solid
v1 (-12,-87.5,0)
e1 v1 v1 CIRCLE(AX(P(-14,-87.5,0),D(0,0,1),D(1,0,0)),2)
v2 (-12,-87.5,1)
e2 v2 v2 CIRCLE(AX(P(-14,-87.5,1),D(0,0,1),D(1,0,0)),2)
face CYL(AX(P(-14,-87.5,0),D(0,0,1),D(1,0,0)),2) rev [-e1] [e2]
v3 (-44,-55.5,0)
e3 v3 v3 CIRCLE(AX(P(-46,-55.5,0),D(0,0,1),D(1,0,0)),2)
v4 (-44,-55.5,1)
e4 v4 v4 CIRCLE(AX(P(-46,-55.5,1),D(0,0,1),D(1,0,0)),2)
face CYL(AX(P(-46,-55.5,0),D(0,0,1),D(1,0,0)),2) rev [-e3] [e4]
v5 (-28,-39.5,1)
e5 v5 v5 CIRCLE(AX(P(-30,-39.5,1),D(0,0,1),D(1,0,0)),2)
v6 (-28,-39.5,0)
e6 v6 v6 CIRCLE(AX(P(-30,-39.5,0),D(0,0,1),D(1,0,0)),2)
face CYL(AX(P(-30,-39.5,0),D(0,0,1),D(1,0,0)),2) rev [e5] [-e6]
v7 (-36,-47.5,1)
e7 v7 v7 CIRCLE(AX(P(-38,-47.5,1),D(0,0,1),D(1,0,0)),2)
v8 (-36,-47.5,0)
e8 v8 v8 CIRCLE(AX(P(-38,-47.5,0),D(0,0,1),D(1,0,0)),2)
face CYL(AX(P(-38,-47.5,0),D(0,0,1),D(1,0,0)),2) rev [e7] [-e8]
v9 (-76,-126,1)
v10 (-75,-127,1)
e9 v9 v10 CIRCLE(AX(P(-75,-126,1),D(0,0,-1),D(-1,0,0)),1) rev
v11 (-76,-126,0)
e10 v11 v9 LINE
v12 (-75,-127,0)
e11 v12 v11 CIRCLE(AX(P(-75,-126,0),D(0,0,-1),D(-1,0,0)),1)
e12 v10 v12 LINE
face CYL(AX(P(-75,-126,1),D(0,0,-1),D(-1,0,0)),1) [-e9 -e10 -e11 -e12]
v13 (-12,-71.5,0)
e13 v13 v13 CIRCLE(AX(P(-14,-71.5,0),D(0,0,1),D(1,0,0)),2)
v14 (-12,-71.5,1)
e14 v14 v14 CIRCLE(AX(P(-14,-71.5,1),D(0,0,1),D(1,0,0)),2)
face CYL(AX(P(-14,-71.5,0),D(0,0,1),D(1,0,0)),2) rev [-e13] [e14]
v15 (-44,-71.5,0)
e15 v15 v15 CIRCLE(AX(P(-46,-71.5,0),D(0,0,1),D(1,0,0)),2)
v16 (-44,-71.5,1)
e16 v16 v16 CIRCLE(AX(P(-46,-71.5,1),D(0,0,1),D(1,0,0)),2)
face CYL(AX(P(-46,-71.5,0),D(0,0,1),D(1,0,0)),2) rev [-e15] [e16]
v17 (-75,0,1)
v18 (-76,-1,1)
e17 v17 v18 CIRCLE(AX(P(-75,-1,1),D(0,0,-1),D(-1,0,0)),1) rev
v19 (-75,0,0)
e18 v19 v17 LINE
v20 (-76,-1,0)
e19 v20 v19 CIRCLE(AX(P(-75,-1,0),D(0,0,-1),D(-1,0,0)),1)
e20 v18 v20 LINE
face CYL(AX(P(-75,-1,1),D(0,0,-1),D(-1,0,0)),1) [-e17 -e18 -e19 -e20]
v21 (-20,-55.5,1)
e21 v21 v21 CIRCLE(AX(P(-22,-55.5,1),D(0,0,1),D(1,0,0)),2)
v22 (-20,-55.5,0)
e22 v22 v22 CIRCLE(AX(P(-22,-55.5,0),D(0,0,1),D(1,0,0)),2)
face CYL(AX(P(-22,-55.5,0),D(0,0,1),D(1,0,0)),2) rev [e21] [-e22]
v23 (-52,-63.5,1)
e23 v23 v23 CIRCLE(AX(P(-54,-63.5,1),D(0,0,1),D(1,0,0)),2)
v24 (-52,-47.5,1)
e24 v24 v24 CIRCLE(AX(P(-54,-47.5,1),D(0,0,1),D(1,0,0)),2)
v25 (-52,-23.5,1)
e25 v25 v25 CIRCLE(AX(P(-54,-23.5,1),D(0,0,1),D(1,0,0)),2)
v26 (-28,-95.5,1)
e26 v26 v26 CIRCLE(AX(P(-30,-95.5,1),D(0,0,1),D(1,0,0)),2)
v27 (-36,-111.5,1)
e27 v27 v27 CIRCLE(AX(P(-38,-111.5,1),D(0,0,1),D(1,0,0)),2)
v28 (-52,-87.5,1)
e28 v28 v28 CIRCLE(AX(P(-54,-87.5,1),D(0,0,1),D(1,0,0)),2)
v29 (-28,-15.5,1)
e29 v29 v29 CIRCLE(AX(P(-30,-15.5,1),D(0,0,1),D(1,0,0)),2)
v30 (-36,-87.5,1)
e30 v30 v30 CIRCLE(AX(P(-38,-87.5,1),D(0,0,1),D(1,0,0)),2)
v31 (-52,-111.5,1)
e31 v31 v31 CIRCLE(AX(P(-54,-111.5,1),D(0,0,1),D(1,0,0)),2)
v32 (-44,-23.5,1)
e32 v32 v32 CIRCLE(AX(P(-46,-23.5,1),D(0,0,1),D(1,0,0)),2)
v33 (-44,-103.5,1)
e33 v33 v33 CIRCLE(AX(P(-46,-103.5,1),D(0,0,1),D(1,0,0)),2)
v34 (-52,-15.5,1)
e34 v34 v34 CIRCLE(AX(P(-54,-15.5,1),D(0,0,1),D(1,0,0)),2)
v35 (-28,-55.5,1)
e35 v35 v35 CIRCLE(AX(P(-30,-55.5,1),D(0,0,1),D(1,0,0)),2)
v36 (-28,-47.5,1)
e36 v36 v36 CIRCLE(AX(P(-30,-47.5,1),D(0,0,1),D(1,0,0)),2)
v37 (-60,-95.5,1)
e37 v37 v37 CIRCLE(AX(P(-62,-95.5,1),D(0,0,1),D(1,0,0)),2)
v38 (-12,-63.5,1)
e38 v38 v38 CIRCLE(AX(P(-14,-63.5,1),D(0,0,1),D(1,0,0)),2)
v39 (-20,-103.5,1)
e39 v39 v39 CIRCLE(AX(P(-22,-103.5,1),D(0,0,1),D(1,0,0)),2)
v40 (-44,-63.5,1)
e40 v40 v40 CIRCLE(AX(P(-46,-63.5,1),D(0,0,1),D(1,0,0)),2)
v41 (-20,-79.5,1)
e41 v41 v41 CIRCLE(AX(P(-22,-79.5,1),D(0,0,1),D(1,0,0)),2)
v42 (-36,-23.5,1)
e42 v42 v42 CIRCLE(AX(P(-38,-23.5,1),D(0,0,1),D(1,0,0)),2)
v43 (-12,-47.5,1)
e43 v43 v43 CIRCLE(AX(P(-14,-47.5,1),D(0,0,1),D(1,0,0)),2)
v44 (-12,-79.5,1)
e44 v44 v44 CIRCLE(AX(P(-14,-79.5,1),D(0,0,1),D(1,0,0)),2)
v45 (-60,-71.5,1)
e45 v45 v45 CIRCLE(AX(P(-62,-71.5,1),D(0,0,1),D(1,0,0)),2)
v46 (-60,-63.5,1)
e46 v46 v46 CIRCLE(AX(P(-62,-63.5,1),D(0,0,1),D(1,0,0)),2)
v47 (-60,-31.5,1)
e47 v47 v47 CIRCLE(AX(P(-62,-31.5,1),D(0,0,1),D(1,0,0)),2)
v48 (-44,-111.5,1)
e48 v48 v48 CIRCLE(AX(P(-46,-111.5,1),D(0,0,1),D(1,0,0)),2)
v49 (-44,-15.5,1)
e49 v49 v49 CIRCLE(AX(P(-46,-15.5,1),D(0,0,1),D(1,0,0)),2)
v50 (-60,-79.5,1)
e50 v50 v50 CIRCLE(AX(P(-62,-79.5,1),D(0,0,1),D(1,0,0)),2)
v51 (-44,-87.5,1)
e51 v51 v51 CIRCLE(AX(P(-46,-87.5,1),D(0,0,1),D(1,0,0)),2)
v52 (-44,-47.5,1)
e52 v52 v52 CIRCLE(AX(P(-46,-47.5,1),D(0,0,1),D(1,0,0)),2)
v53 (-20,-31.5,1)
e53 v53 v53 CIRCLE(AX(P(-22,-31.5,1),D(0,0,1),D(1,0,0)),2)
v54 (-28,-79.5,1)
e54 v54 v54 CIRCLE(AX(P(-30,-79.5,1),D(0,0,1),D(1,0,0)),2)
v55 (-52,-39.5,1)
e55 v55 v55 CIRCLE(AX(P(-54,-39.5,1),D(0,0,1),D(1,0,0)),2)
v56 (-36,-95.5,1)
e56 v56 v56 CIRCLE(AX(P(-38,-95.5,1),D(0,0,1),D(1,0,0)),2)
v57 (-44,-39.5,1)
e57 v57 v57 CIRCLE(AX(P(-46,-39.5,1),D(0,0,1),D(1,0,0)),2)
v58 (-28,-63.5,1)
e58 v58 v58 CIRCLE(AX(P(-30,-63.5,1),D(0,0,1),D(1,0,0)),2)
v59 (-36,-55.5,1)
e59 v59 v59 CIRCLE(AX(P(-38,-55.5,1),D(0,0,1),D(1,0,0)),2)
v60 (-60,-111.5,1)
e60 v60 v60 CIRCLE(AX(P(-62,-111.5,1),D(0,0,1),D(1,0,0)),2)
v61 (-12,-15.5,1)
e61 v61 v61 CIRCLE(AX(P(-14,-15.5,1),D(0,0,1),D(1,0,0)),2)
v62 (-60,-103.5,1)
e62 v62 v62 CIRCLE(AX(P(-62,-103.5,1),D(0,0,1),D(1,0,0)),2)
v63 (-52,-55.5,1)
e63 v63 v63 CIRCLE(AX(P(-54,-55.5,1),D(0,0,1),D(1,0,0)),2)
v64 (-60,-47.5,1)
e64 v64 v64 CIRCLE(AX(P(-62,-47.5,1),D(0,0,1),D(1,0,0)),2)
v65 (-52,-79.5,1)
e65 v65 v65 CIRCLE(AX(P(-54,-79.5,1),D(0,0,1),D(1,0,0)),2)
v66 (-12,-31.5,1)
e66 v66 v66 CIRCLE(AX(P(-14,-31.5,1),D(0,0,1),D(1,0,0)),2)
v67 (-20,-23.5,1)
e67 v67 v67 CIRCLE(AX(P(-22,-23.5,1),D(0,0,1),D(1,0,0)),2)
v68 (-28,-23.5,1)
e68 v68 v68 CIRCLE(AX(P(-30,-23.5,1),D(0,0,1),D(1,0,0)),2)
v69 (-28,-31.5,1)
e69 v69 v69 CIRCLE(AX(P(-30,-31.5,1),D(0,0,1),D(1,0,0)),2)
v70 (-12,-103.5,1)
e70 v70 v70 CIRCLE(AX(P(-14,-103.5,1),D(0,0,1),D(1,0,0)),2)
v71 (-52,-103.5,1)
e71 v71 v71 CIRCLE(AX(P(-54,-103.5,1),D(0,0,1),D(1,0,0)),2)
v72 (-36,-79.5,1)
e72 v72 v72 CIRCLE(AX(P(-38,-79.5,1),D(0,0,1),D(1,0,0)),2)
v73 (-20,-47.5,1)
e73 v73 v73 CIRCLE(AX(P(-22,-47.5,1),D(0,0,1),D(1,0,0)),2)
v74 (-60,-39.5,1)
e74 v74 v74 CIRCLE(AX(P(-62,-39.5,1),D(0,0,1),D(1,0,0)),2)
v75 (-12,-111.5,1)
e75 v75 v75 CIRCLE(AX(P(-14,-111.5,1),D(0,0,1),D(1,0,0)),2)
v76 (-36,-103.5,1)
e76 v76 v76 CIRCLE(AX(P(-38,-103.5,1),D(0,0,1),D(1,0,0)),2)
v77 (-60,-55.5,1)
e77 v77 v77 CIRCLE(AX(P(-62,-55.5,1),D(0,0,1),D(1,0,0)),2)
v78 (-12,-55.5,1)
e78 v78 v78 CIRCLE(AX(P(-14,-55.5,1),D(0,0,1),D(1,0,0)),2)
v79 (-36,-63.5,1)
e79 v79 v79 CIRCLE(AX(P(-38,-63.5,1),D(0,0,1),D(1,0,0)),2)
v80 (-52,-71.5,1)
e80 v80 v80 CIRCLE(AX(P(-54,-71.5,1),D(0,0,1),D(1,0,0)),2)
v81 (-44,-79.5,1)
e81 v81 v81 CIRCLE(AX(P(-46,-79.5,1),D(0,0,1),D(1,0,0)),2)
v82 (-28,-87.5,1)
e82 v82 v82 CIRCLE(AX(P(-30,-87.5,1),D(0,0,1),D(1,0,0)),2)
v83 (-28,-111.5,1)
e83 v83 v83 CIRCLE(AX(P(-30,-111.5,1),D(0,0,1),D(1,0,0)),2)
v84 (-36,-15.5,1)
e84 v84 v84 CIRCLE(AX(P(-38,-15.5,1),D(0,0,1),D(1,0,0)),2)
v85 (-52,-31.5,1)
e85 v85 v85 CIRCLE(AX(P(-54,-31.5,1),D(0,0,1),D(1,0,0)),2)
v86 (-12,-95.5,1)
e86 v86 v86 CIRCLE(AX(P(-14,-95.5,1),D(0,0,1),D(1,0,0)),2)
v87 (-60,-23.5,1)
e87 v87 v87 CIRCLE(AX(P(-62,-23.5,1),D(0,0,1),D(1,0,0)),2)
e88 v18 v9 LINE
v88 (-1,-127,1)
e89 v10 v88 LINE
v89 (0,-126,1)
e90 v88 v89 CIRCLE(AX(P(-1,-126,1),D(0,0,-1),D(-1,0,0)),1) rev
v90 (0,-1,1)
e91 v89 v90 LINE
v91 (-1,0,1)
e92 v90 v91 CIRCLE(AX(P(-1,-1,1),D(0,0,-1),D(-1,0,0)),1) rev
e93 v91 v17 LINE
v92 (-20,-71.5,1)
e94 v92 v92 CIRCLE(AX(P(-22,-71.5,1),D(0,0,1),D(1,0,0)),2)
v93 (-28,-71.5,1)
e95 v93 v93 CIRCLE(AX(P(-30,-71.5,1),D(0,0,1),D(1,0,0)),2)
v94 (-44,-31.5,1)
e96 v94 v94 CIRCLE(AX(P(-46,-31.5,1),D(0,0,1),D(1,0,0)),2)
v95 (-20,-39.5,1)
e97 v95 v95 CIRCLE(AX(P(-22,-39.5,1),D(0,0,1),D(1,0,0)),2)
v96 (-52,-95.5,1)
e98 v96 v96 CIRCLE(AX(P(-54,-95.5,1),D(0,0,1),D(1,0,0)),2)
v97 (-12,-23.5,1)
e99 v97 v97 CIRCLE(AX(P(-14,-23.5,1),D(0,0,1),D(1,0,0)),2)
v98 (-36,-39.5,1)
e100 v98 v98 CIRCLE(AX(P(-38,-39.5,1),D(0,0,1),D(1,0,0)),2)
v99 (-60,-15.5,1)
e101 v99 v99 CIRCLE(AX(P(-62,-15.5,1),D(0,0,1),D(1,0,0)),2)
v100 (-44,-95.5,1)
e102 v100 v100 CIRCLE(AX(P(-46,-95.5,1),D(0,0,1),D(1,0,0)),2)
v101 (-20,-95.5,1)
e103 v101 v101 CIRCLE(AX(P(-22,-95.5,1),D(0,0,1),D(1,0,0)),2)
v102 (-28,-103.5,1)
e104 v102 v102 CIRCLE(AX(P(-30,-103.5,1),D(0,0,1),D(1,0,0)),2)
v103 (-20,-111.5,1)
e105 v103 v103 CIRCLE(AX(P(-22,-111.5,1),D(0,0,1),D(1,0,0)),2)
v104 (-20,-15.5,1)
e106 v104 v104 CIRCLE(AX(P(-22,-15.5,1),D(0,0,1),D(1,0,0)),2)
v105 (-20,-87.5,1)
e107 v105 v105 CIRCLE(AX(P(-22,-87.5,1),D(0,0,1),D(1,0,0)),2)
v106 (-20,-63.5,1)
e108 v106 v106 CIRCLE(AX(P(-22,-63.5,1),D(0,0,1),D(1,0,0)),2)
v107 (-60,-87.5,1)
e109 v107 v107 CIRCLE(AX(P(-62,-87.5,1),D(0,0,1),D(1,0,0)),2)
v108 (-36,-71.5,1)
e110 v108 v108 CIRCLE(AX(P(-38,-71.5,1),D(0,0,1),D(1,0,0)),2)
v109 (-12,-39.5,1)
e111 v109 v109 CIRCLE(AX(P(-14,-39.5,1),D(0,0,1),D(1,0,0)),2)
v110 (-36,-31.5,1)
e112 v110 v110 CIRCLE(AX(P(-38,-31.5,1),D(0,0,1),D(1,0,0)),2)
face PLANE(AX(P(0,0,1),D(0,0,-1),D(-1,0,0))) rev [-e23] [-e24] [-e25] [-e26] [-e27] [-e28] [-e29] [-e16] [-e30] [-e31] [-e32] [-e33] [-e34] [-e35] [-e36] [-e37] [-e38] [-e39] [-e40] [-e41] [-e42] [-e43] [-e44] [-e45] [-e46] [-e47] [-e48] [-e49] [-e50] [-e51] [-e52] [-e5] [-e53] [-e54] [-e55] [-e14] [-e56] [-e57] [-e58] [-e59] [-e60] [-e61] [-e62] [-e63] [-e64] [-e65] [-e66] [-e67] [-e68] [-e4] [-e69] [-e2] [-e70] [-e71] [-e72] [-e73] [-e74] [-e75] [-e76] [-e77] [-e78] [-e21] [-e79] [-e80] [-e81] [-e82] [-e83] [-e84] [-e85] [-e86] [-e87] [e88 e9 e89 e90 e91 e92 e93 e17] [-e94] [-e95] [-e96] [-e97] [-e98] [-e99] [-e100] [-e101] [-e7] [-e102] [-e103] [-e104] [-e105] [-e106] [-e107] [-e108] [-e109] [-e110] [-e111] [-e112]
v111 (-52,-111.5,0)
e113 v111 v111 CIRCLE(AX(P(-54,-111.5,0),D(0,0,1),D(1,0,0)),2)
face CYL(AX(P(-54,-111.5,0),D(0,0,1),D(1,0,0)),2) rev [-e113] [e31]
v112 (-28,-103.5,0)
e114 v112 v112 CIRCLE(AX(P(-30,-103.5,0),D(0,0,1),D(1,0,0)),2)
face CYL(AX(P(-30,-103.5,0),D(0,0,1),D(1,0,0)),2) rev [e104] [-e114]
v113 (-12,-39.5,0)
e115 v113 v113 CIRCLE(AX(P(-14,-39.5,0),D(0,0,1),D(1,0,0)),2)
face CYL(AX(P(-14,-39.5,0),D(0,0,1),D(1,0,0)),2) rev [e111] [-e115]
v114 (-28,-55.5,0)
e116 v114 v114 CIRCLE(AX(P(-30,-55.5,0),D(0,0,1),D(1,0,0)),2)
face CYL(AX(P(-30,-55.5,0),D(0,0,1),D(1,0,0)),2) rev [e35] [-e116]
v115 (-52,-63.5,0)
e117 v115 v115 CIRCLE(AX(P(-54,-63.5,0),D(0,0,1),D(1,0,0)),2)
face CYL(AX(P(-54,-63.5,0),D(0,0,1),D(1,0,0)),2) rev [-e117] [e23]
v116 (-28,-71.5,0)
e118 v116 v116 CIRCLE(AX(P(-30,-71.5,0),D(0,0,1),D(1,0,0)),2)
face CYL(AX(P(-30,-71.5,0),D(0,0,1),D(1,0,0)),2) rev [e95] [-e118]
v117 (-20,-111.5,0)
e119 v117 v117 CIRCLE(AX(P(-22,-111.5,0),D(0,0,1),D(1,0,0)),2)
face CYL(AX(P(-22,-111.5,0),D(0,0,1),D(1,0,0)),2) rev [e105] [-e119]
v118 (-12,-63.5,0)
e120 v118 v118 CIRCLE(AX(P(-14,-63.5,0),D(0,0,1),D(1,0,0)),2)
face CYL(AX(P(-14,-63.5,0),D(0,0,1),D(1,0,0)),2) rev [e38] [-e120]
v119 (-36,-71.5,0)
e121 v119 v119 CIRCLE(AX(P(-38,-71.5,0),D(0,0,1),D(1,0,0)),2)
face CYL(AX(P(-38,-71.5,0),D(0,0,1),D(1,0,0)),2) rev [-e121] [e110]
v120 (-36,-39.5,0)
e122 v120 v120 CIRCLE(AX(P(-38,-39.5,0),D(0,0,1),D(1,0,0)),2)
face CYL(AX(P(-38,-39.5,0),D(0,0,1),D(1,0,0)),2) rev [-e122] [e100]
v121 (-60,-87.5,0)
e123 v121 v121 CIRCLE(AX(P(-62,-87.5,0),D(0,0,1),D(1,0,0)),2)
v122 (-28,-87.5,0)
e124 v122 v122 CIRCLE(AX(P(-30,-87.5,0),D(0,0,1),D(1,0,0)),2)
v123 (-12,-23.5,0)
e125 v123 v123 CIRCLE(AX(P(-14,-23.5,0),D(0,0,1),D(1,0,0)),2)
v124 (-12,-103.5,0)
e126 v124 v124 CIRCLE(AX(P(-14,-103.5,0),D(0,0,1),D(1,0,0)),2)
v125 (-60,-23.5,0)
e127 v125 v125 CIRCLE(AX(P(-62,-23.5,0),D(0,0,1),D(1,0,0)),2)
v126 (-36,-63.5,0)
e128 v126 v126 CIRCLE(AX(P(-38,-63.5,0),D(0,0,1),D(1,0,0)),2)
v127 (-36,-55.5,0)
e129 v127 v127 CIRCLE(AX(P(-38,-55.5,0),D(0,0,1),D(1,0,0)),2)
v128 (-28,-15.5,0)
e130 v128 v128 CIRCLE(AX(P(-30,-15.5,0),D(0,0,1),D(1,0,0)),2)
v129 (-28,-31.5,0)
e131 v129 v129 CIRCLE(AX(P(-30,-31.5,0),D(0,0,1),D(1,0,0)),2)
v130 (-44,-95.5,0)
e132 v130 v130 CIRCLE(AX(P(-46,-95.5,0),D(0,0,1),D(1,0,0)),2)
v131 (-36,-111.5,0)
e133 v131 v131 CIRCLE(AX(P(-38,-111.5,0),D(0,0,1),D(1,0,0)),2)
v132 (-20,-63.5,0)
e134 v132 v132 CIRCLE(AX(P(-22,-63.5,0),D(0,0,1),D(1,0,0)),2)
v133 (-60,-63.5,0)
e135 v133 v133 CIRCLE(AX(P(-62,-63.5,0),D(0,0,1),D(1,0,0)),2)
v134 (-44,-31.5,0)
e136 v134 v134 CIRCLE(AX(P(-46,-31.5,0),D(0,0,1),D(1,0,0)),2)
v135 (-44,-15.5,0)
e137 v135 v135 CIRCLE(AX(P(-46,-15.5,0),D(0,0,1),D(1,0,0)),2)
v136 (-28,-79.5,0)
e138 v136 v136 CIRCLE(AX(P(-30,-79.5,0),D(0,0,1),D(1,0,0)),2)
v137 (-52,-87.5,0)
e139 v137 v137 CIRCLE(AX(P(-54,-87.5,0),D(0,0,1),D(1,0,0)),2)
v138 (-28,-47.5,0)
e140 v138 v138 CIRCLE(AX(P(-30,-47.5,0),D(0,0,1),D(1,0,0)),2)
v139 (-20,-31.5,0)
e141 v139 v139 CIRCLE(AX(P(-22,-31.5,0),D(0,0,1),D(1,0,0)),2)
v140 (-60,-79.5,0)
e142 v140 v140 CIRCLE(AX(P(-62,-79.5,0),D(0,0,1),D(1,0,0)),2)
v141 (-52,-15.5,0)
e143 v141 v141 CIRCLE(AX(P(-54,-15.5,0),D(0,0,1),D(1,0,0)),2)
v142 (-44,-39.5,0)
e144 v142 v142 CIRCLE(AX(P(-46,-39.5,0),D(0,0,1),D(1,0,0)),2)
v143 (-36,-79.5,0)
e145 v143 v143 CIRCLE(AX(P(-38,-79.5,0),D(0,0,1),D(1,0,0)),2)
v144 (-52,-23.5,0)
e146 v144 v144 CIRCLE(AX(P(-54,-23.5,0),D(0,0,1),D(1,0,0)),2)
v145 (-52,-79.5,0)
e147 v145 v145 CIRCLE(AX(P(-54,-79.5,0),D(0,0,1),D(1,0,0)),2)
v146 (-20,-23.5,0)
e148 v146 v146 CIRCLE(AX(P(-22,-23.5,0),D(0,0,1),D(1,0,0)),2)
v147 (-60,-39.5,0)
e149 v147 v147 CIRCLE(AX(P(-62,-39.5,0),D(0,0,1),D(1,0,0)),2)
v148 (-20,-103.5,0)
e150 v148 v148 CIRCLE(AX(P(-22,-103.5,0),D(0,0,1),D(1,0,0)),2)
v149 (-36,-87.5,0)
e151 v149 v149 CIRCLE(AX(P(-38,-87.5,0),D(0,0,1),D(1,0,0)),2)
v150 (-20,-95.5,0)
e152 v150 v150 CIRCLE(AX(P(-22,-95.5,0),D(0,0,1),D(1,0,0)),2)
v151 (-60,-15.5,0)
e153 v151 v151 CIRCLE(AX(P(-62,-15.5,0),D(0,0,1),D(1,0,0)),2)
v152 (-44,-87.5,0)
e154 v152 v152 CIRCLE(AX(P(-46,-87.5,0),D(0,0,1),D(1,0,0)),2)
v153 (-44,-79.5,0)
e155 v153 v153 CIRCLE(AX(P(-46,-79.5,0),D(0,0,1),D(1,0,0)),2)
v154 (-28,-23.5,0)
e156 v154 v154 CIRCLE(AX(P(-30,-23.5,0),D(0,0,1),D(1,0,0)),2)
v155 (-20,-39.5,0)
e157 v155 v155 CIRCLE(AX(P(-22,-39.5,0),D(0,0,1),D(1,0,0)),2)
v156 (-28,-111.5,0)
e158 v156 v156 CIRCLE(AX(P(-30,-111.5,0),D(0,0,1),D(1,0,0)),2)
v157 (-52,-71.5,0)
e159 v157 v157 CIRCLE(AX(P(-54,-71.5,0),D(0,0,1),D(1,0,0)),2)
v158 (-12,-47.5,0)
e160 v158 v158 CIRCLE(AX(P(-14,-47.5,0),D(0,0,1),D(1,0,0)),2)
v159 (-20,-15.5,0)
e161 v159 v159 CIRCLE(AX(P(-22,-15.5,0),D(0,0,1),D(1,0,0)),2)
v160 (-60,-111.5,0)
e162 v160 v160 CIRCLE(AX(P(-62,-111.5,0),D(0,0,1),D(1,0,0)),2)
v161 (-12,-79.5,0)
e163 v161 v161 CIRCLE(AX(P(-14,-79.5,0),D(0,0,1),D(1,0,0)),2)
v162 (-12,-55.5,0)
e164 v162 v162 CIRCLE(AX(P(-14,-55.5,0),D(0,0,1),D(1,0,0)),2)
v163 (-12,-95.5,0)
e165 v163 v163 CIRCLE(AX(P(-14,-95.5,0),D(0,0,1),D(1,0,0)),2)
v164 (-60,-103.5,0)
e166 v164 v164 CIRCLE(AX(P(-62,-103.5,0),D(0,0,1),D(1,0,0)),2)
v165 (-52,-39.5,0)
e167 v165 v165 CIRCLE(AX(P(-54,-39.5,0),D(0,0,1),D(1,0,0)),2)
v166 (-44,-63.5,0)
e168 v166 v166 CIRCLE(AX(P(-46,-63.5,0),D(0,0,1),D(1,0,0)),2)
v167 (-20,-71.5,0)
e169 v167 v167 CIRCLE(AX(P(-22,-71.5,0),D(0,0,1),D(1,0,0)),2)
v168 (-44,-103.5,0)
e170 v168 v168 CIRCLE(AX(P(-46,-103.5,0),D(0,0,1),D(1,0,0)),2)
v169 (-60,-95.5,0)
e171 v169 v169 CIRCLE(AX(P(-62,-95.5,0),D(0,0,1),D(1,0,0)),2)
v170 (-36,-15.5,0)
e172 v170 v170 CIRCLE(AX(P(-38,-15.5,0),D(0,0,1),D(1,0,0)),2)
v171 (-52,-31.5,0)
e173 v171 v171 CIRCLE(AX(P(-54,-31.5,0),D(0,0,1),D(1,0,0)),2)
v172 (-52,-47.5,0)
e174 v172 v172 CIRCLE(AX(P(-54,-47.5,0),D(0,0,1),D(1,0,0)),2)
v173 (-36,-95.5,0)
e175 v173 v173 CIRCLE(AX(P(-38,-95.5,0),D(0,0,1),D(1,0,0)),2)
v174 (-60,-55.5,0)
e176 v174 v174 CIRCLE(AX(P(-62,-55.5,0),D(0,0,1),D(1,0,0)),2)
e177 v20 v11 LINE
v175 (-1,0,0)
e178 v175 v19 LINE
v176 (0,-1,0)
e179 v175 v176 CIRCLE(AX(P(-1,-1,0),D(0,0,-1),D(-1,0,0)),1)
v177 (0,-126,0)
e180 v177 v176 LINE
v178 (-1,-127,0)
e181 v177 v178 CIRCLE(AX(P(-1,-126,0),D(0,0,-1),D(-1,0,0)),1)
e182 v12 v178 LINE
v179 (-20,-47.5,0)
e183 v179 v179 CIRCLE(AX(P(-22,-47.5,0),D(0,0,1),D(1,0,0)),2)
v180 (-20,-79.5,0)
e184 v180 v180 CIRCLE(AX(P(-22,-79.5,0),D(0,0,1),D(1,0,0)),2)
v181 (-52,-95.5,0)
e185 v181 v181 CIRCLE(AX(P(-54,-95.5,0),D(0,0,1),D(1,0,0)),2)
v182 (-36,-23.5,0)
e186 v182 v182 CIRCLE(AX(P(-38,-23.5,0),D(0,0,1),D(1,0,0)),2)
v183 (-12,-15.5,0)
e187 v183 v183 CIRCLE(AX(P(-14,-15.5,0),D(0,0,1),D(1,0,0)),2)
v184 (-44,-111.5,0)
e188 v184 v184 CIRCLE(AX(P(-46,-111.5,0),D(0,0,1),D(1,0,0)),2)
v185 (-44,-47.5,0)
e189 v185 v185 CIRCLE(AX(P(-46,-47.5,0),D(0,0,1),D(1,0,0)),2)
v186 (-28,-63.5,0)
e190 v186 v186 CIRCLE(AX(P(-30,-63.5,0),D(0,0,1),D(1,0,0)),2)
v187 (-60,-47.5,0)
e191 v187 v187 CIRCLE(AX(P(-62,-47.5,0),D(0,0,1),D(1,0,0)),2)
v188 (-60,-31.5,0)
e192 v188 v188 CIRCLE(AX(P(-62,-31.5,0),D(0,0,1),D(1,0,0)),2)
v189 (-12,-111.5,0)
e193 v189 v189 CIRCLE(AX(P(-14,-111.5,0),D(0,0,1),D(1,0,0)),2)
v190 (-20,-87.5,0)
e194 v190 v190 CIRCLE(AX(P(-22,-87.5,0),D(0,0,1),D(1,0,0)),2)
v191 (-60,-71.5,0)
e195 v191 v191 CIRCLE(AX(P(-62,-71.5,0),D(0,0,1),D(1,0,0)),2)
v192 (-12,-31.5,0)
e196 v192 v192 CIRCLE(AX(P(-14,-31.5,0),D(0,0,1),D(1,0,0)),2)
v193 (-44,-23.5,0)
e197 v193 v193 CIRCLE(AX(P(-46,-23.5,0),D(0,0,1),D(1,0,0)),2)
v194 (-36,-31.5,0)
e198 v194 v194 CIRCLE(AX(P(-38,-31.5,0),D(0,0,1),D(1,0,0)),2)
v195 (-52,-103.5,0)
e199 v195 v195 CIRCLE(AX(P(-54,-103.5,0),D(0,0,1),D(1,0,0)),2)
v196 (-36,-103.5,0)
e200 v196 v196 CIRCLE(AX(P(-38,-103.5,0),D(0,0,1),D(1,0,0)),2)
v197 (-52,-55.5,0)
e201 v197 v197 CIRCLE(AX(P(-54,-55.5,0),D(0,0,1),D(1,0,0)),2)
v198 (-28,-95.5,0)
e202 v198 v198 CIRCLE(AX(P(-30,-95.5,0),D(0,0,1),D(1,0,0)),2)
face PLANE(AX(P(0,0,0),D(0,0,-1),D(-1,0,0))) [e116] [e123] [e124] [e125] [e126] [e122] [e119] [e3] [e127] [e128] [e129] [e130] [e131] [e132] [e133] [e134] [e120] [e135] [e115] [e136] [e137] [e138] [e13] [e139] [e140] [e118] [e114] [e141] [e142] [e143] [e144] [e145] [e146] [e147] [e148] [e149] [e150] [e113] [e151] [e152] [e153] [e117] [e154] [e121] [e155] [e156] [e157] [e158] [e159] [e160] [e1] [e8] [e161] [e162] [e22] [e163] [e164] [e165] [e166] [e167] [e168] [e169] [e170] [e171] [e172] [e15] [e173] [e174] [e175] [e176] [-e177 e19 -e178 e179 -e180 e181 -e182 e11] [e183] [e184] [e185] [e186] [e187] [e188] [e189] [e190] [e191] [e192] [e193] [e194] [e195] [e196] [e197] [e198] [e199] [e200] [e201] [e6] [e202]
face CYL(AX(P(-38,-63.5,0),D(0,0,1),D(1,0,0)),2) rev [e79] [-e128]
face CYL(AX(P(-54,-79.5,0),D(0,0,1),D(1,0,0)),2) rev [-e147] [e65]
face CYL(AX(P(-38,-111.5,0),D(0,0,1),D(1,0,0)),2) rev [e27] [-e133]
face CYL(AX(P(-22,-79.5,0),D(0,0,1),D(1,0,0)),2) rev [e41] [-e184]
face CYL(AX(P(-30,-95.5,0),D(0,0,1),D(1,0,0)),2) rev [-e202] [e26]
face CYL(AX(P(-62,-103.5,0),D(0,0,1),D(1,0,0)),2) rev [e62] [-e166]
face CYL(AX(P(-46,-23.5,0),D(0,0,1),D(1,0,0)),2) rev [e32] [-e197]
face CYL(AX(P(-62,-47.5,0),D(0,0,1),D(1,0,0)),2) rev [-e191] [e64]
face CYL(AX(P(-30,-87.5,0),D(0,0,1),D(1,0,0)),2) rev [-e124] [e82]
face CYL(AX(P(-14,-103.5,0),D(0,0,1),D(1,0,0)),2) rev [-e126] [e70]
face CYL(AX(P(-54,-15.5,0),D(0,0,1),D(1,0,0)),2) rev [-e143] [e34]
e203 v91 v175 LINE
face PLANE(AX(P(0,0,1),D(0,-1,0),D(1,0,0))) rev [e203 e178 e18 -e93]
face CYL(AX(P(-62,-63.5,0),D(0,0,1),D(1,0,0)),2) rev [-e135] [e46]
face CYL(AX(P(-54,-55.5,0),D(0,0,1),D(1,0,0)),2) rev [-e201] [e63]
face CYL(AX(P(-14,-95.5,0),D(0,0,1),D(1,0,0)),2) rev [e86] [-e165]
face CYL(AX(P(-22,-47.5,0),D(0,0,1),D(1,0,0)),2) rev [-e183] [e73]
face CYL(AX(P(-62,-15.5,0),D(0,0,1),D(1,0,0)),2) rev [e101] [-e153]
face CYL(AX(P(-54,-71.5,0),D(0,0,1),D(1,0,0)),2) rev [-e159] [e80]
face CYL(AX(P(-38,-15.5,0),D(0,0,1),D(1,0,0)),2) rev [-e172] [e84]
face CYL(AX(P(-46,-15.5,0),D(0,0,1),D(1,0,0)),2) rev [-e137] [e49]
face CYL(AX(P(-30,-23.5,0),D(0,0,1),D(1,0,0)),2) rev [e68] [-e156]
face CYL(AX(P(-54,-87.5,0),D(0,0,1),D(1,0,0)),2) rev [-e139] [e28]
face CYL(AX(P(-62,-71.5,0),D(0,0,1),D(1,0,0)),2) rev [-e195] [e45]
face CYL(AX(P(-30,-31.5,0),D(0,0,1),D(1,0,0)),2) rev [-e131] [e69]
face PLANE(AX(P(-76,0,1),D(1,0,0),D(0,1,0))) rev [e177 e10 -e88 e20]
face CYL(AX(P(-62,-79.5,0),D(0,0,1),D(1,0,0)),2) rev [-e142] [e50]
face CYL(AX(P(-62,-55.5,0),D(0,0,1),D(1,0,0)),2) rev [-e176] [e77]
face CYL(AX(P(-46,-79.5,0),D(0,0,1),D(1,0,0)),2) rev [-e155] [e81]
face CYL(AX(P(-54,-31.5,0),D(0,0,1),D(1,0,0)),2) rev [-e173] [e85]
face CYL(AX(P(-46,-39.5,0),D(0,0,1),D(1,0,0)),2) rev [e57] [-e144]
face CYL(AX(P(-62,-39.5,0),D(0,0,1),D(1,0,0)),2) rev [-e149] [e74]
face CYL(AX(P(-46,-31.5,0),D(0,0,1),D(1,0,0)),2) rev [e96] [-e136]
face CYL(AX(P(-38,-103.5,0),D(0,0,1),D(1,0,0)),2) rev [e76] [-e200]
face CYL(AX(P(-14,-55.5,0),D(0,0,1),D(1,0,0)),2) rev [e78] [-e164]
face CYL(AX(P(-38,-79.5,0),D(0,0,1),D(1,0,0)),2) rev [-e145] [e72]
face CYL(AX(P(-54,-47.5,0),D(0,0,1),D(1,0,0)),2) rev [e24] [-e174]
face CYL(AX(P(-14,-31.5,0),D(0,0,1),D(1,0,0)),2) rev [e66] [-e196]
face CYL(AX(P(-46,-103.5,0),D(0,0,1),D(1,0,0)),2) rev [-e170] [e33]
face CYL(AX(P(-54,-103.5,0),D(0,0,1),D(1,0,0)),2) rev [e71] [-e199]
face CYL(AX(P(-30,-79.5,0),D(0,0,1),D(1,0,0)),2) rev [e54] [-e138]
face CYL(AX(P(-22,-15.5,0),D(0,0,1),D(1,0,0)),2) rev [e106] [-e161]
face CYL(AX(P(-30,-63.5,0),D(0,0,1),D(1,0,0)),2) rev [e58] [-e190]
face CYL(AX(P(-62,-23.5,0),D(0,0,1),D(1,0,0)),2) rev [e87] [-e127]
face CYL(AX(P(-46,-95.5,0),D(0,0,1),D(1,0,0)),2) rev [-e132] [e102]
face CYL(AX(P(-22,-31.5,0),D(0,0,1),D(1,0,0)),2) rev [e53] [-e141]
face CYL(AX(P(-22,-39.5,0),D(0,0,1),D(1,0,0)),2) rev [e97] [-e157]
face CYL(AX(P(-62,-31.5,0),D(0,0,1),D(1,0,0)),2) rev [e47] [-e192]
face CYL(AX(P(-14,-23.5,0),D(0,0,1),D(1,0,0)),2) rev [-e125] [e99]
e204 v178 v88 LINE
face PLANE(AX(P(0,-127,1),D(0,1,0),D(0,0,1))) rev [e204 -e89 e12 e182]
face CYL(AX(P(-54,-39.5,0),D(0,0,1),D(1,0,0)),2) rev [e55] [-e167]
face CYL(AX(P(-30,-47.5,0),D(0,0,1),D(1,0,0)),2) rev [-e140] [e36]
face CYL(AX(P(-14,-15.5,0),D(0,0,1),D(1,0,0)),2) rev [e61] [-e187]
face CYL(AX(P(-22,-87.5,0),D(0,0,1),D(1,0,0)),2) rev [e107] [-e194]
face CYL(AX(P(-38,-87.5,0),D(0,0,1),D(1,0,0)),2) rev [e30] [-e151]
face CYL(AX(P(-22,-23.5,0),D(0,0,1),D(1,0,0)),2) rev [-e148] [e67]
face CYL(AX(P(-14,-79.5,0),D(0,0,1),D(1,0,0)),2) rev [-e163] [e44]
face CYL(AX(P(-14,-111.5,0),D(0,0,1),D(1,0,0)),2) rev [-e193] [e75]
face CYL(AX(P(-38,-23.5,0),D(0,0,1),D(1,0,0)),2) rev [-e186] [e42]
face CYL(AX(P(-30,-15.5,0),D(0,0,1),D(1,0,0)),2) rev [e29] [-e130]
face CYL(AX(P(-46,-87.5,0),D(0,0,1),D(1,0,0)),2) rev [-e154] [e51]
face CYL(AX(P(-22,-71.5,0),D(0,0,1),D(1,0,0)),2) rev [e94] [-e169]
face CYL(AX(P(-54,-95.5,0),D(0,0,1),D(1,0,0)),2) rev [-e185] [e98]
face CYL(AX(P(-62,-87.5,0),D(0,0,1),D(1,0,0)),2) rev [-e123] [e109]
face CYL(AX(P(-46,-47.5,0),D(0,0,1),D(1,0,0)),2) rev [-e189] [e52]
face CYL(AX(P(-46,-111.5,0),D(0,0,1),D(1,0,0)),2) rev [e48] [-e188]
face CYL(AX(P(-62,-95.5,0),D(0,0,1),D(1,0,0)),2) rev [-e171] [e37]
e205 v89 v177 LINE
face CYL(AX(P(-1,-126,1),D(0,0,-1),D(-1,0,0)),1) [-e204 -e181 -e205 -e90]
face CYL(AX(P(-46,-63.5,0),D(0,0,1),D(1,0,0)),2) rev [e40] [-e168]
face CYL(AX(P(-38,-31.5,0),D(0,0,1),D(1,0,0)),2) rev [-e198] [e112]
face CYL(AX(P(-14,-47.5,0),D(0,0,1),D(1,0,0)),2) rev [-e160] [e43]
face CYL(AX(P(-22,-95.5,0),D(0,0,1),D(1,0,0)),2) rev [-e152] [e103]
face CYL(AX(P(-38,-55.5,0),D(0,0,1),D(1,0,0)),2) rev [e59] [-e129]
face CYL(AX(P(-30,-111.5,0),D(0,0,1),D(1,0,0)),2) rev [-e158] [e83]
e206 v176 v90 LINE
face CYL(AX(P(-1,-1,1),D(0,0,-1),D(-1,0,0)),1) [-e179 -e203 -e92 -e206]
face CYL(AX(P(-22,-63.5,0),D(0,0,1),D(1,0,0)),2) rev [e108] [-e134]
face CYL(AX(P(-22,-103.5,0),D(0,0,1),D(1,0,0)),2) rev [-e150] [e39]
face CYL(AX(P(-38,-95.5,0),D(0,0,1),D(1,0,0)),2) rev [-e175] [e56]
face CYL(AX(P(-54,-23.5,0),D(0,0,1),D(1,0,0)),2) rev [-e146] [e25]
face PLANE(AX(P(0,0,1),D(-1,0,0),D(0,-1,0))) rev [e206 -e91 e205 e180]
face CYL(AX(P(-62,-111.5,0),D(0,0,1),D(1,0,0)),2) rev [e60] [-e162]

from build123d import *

# Parameters (mm, degrees)
SKETCH_1_W        = 76
SKETCH_1_H        = 127
EXTRUDE_1_DEPTH   = 1
FILLET_1_R        = 1
OTHER_2_OUTLINE_R = 2
OTHER_2_DEPTH     = 1


# Read off the part's stored shape, not the designer's step: 填充阵列2
with BuildPart() as part:
    # 草图1 → 凸台-拉伸1 (new body)
    with BuildSketch(Plane.XY):
        with Locations((-38, -63.5)):
            Rectangle(SKETCH_1_W, SKETCH_1_H)
    extrude(amount=EXTRUDE_1_DEPTH)

    # 圆角1
    fillet_1_edges = [part.edges().sort_by_distance(p)[0] for p in [
        (0, -127, 0.5),
        (-76, -127, 0.5),
        (-76, 0, 0.5),
        (0, 0, 0.5),
    ]]
    fillet(fillet_1_edges, radius=FILLET_1_R)

    # 填充阵列2 outline → 填充阵列2 (cut)
    with BuildSketch(Plane.XY):
        with Locations((-38, -63.5)):
            Circle(OTHER_2_OUTLINE_R)
        with Locations((-38, -23.5)):
            Circle(OTHER_2_OUTLINE_R)
        with Locations((-46, -23.5)):
            Circle(OTHER_2_OUTLINE_R)
        with Locations((-54, -23.5)):
            Circle(OTHER_2_OUTLINE_R)
        with Locations((-62, -23.5)):
            Circle(OTHER_2_OUTLINE_R)
        with Locations((-14, -31.5)):
            Circle(OTHER_2_OUTLINE_R)
        with Locations((-22, -31.5)):
            Circle(OTHER_2_OUTLINE_R)
        with Locations((-30, -31.5)):
            Circle(OTHER_2_OUTLINE_R)
        with Locations((-38, -31.5)):
            Circle(OTHER_2_OUTLINE_R)
        with Locations((-30, -39.5)):
            Circle(OTHER_2_OUTLINE_R)
        with Locations((-62, -111.5)):
            Circle(OTHER_2_OUTLINE_R)
        with Locations((-38, -39.5)):
            Circle(OTHER_2_OUTLINE_R)
        with Locations((-54, -111.5)):
            Circle(OTHER_2_OUTLINE_R)
        with Locations((-46, -31.5)):
            Circle(OTHER_2_OUTLINE_R)
        with Locations((-54, -31.5)):
            Circle(OTHER_2_OUTLINE_R)
        with Locations((-62, -31.5)):
            Circle(OTHER_2_OUTLINE_R)
        with Locations((-22, -39.5)):
            Circle(OTHER_2_OUTLINE_R)
        with Locations((-14, -15.5)):
            Circle(OTHER_2_OUTLINE_R)
        with Locations((-22, -15.5)):
            Circle(OTHER_2_OUTLINE_R)
        with Locations((-62, -15.5)):
            Circle(OTHER_2_OUTLINE_R)
        with Locations((-14, -23.5)):
            Circle(OTHER_2_OUTLINE_R)
        with Locations((-22, -23.5)):
            Circle(OTHER_2_OUTLINE_R)
        with Locations((-30, -23.5)):
            Circle(OTHER_2_OUTLINE_R)
        with Locations((-54, -15.5)):
            Circle(OTHER_2_OUTLINE_R)
        with Locations((-46, -15.5)):
            Circle(OTHER_2_OUTLINE_R)
        with Locations((-38, -15.5)):
            Circle(OTHER_2_OUTLINE_R)
        with Locations((-30, -15.5)):
            Circle(OTHER_2_OUTLINE_R)
        with Locations((-14, -87.5)):
            Circle(OTHER_2_OUTLINE_R)
        with Locations((-38, -55.5)):
            Circle(OTHER_2_OUTLINE_R)
        with Locations((-46, -79.5)):
            Circle(OTHER_2_OUTLINE_R)
        with Locations((-22, -87.5)):
            Circle(OTHER_2_OUTLINE_R)
        with Locations((-38, -79.5)):
            Circle(OTHER_2_OUTLINE_R)
        with Locations((-46, -55.5)):
            Circle(OTHER_2_OUTLINE_R)
        with Locations((-14, -79.5)):
            Circle(OTHER_2_OUTLINE_R)
        with Locations((-30, -79.5)):
            Circle(OTHER_2_OUTLINE_R)
        with Locations((-14, -95.5)):
            Circle(OTHER_2_OUTLINE_R)
        with Locations((-54, -63.5)):
            Circle(OTHER_2_OUTLINE_R)
        with Locations((-46, -87.5)):
            Circle(OTHER_2_OUTLINE_R)
        with Locations((-22, -95.5)):
            Circle(OTHER_2_OUTLINE_R)
        with Locations((-54, -79.5)):
            Circle(OTHER_2_OUTLINE_R)
        with Locations((-30, -87.5)):
            Circle(OTHER_2_OUTLINE_R)
        with Locations((-54, -71.5)):
            Circle(OTHER_2_OUTLINE_R)
        with Locations((-38, -87.5)):
            Circle(OTHER_2_OUTLINE_R)
        with Locations((-22, -63.5)):
            Circle(OTHER_2_OUTLINE_R)
        with Locations((-30, -71.5)):
            Circle(OTHER_2_OUTLINE_R)
        with Locations((-14, -47.5)):
            Circle(OTHER_2_OUTLINE_R)
        with Locations((-22, -55.5)):
            Circle(OTHER_2_OUTLINE_R)
        with Locations((-30, -55.5)):
            Circle(OTHER_2_OUTLINE_R)
        with Locations((-22, -47.5)):
            Circle(OTHER_2_OUTLINE_R)
        with Locations((-14, -39.5)):
            Circle(OTHER_2_OUTLINE_R)
        with Locations((-30, -63.5)):
            Circle(OTHER_2_OUTLINE_R)
        with Locations((-46, -71.5)):
            Circle(OTHER_2_OUTLINE_R)
        with Locations((-22, -79.5)):
            Circle(OTHER_2_OUTLINE_R)
        with Locations((-14, -71.5)):
            Circle(OTHER_2_OUTLINE_R)
        with Locations((-46, -63.5)):
            Circle(OTHER_2_OUTLINE_R)
        with Locations((-14, -55.5)):
            Circle(OTHER_2_OUTLINE_R)
        with Locations((-38, -71.5)):
            Circle(OTHER_2_OUTLINE_R)
        with Locations((-22, -71.5)):
            Circle(OTHER_2_OUTLINE_R)
        with Locations((-14, -63.5)):
            Circle(OTHER_2_OUTLINE_R)
        with Locations((-62, -55.5)):
            Circle(OTHER_2_OUTLINE_R)
        with Locations((-46, -103.5)):
            Circle(OTHER_2_OUTLINE_R)
        with Locations((-22, -111.5)):
            Circle(OTHER_2_OUTLINE_R)
        with Locations((-62, -47.5)):
            Circle(OTHER_2_OUTLINE_R)
        with Locations((-14, -111.5)):
            Circle(OTHER_2_OUTLINE_R)
        with Locations((-38, -103.5)):
            Circle(OTHER_2_OUTLINE_R)
        with Locations((-62, -95.5)):
            Circle(OTHER_2_OUTLINE_R)
        with Locations((-62, -63.5)):
            Circle(OTHER_2_OUTLINE_R)
        with Locations((-38, -111.5)):
            Circle(OTHER_2_OUTLINE_R)
        with Locations((-54, -39.5)):
            Circle(OTHER_2_OUTLINE_R)
        with Locations((-46, -111.5)):
            Circle(OTHER_2_OUTLINE_R)
        with Locations((-46, -39.5)):
            Circle(OTHER_2_OUTLINE_R)
        with Locations((-62, -103.5)):
            Circle(OTHER_2_OUTLINE_R)
        with Locations((-62, -39.5)):
            Circle(OTHER_2_OUTLINE_R)
        with Locations((-30, -111.5)):
            Circle(OTHER_2_OUTLINE_R)
        with Locations((-54, -103.5)):
            Circle(OTHER_2_OUTLINE_R)
        with Locations((-62, -87.5)):
            Circle(OTHER_2_OUTLINE_R)
        with Locations((-38, -95.5)):
            Circle(OTHER_2_OUTLINE_R)
        with Locations((-14, -103.5)):
            Circle(OTHER_2_OUTLINE_R)
        with Locations((-46, -47.5)):
            Circle(OTHER_2_OUTLINE_R)
        with Locations((-54, -55.5)):
            Circle(OTHER_2_OUTLINE_R)
        with Locations((-54, -87.5)):
            Circle(OTHER_2_OUTLINE_R)
        with Locations((-30, -95.5)):
            Circle(OTHER_2_OUTLINE_R)
        with Locations((-54, -47.5)):
            Circle(OTHER_2_OUTLINE_R)
        with Locations((-30, -47.5)):
            Circle(OTHER_2_OUTLINE_R)
        with Locations((-30, -103.5)):
            Circle(OTHER_2_OUTLINE_R)
        with Locations((-54, -95.5)):
            Circle(OTHER_2_OUTLINE_R)
        with Locations((-62, -71.5)):
            Circle(OTHER_2_OUTLINE_R)
        with Locations((-38, -47.5)):
            Circle(OTHER_2_OUTLINE_R)
        with Locations((-22, -103.5)):
            Circle(OTHER_2_OUTLINE_R)
        with Locations((-46, -95.5)):
            Circle(OTHER_2_OUTLINE_R)
        with Locations((-62, -79.5)):
            Circle(OTHER_2_OUTLINE_R)
    extrude(amount=OTHER_2_DEPTH, mode=Mode.SUBTRACT)


solid = part.part
